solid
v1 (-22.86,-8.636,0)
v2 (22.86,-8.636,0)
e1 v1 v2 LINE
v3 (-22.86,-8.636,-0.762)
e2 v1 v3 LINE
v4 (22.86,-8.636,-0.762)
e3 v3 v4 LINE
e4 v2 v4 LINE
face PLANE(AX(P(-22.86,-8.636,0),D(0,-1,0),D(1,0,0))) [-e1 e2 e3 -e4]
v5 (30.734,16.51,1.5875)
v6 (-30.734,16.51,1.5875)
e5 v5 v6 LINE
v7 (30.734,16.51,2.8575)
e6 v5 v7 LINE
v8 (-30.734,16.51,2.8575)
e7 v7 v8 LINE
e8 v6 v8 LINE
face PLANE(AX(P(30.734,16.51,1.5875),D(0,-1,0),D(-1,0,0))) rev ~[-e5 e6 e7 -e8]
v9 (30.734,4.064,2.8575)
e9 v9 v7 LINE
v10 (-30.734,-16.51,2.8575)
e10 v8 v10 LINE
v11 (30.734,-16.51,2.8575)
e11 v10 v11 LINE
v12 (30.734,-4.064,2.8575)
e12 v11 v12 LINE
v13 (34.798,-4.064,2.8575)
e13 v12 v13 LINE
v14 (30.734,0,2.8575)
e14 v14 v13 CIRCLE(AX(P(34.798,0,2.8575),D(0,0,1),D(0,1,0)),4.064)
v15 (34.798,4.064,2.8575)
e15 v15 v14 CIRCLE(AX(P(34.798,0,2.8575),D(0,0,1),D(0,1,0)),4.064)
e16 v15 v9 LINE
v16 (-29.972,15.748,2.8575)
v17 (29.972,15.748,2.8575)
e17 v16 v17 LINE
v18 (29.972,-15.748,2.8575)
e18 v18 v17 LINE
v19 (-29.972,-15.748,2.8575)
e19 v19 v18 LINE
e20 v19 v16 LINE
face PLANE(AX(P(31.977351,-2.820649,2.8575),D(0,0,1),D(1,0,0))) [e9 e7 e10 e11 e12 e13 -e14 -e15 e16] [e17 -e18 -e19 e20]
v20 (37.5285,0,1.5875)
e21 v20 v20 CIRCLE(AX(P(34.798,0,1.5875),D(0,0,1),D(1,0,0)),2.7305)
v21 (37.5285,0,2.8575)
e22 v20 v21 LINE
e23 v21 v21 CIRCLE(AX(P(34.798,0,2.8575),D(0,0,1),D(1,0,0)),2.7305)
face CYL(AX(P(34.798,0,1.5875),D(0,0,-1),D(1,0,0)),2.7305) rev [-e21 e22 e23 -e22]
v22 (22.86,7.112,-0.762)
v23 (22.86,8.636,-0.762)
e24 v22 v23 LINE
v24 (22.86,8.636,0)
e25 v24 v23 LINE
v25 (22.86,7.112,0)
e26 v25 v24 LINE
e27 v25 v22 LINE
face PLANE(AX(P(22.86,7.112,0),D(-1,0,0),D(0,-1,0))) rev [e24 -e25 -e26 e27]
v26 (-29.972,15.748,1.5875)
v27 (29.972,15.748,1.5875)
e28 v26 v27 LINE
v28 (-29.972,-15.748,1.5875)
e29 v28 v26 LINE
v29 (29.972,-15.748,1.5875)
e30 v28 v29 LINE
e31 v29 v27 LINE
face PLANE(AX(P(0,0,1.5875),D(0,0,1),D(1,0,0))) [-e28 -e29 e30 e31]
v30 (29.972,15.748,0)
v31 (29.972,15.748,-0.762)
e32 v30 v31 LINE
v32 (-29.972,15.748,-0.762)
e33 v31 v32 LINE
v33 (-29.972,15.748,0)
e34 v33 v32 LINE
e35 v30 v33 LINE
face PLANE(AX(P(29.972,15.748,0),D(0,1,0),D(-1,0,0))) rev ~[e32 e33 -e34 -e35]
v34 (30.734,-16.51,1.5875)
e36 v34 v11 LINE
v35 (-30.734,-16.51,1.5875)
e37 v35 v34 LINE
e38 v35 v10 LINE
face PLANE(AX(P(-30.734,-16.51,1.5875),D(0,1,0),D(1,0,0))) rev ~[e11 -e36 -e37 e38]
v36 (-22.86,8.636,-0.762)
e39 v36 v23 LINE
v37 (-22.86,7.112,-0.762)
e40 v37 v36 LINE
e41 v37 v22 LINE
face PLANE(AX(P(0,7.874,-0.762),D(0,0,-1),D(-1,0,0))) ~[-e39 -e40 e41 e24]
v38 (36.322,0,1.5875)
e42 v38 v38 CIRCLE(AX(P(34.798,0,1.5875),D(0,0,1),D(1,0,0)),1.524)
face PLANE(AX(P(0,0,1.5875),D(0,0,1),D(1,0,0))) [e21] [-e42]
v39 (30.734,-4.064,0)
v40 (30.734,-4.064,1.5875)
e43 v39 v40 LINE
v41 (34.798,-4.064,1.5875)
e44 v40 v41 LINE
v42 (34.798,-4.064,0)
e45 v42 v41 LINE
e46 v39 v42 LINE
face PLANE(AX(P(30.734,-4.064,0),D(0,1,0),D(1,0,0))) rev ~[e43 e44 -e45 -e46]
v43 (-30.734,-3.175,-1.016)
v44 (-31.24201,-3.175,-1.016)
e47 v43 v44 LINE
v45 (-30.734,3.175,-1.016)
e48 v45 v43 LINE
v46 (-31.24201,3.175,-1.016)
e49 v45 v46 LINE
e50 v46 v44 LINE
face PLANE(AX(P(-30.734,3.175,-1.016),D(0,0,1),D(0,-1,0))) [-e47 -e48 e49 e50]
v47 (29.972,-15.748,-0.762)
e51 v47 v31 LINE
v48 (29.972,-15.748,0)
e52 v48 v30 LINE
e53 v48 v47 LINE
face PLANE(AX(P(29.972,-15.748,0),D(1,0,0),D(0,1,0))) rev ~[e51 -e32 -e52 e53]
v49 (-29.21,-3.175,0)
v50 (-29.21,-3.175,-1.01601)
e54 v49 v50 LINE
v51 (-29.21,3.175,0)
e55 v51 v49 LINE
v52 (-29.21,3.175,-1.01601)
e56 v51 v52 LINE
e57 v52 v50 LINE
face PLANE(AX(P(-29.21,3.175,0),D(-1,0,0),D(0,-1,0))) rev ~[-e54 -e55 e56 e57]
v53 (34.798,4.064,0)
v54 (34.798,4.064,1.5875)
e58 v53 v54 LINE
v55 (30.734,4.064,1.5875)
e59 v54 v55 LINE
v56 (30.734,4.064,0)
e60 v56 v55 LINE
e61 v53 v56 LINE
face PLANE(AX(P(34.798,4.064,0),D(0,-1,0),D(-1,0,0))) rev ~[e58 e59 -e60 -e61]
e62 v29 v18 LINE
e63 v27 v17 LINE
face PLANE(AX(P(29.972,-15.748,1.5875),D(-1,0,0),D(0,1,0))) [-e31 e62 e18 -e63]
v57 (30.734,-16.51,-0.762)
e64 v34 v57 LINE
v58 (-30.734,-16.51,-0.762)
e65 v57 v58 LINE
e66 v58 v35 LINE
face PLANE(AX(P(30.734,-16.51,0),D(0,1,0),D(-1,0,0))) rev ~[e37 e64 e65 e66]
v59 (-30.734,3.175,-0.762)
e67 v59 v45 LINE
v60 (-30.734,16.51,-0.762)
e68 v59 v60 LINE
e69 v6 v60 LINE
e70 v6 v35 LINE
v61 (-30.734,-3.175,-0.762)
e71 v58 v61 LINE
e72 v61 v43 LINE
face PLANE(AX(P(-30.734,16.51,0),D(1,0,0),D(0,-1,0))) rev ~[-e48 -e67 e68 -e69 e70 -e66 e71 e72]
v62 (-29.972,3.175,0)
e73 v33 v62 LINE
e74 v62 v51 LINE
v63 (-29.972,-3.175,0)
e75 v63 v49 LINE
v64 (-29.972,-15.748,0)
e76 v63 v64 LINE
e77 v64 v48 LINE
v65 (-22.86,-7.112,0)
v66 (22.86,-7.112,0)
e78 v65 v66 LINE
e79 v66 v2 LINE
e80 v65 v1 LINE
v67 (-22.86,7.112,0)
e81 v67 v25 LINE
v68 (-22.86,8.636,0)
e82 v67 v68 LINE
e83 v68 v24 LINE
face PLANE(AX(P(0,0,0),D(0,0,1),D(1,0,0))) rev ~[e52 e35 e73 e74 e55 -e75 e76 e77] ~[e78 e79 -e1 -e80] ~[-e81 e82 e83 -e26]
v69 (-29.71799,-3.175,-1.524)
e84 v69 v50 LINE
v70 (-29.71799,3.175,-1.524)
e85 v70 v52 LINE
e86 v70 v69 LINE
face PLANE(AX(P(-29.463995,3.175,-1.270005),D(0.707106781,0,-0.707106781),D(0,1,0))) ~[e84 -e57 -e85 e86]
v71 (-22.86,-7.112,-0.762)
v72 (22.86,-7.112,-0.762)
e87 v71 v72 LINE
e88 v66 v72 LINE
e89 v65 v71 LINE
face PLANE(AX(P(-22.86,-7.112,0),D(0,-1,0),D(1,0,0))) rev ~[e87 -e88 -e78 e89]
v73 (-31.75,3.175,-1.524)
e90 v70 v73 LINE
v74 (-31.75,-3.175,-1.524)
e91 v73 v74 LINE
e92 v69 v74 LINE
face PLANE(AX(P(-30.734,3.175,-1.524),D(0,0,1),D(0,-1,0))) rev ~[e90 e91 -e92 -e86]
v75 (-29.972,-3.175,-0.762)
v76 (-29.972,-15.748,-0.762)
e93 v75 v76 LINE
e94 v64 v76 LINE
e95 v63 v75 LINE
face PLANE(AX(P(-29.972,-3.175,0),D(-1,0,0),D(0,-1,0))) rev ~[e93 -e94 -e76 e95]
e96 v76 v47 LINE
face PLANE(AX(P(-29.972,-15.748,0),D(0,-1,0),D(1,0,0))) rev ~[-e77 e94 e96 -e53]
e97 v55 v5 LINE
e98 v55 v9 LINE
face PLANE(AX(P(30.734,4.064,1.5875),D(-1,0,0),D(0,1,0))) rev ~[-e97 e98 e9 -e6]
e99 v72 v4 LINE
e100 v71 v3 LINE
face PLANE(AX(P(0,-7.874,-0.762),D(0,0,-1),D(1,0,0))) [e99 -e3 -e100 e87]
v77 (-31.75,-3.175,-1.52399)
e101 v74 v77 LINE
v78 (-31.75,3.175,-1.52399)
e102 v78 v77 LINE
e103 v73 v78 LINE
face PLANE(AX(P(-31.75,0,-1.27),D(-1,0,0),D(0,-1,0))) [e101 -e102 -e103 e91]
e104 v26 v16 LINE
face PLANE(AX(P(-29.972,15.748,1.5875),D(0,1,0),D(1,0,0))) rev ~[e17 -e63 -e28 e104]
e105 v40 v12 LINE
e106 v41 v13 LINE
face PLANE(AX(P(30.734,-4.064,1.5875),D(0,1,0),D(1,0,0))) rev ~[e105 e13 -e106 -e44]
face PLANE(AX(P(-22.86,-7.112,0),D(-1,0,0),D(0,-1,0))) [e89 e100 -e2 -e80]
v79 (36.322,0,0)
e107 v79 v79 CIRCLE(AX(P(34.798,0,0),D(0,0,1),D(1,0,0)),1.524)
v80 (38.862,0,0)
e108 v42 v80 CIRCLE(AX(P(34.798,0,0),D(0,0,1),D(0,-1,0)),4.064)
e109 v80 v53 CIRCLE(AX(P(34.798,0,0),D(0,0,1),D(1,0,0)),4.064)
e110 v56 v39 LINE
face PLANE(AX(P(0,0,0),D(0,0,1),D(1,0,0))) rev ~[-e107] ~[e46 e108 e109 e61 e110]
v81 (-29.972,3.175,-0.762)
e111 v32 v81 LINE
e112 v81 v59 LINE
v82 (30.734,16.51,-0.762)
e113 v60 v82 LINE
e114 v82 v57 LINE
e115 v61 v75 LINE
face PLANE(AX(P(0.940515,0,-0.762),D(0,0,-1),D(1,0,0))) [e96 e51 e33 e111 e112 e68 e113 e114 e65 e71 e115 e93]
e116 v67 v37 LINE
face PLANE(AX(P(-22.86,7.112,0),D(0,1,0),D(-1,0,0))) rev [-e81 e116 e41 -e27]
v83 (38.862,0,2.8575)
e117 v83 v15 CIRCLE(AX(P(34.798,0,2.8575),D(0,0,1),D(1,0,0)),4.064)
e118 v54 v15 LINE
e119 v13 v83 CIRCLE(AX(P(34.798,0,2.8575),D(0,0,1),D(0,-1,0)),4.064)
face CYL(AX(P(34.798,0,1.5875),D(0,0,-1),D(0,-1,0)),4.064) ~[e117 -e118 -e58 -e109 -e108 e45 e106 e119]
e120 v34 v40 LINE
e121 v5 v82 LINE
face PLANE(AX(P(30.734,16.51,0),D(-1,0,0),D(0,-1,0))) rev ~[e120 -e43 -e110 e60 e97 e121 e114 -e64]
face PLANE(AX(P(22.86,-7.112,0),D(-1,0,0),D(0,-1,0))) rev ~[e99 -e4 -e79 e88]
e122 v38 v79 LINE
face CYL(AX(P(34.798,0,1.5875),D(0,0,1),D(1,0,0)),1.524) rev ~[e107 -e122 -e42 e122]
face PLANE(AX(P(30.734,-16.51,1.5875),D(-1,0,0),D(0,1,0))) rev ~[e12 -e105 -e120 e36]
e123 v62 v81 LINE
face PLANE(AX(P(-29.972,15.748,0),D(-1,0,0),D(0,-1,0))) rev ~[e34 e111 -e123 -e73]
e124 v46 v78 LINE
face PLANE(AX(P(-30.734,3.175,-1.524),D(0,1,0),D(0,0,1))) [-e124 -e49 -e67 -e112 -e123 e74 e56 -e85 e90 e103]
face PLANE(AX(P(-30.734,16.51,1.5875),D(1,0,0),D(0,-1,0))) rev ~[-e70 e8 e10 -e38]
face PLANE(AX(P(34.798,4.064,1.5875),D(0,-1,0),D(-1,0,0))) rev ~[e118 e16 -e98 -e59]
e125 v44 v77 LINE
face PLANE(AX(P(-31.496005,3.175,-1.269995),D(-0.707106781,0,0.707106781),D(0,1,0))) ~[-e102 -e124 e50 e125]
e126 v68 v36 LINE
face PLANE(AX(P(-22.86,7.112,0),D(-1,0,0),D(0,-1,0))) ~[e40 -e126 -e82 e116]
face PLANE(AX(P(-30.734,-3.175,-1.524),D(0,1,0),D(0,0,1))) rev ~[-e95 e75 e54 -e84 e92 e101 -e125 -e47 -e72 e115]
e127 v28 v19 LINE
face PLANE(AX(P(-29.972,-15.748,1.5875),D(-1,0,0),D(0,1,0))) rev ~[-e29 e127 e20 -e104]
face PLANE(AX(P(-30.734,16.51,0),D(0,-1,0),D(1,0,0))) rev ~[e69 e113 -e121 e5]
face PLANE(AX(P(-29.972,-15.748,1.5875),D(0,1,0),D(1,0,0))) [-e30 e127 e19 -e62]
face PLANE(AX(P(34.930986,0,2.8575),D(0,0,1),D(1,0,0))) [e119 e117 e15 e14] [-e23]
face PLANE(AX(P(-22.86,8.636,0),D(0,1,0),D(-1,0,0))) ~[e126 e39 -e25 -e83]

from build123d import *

# Parameters (mm, degrees)
F1_DEPTH  = 1.5875
F2_R      = 1.524
F3_DEPTH  = 1.5885
F4_R      = 2.7305
F5_DEPTH  = 1.27
F6_W      = 1.524
F6_H      = 6.35
F7_DEPTH  = 1.524
F8_W      = 6.35
F8_H      = 0.508
F9_DEPTH  = 1.016
F10_SIZE  = 0.50799
F12_DEPTH = 0.762
F13_W     = 59.944
F13_H     = 31.496
F14_DEPTH = 1.27
F15_W     = 45.72
F15_H     = 1.524
F16_DEPTH = 0.762


# Not quite as in the source:
# - a fillet or chamfer is up to 0.001 mm smaller than in the source, because OpenCascade refuses the exact size
# - a pattern or mirror of a feature is missing from the dataset's text; its kind, count and spacing are read off the source's solid


with BuildPart() as f1:
    # F0 (on Top) → F1 (new body)
    with BuildSketch(Plane.XY):
        Polygon((-30.734, -16.51), (30.734, -16.51), (30.734, -4.064), (30.734, 4.064), (30.734, 16.51), (-30.734, 16.51), align=None)
        with BuildLine():
            Line((30.734, 4.064), (30.734, -4.064))
            Line((30.734, -4.064), (34.798, -4.064))
            ThreePointArc((34.798, -4.064), (37.6716819587, -2.8736819587), (38.862, 0))
            ThreePointArc((38.862, 0), (37.6716819587, 2.8736819587), (34.798, 4.064))
            Line((34.798, 4.064), (30.734, 4.064))
        make_face()
    extrude(amount=F1_DEPTH)

    # F2 (on face) → F3 (cut, through all)
    with BuildSketch(Plane.XY.offset(1.5875)):
        with Locations((34.798, 0)):
            Circle(F2_R)
    extrude(amount=-F3_DEPTH, mode=Mode.SUBTRACT)

    # F4 (on face) → F5 (join)
    with BuildSketch(Plane.XY.offset(1.5875)):
        with BuildLine():
            ThreePointArc((34.798, -4.064), (37.6716819587, -2.8736819587), (38.862, 0))
            ThreePointArc((38.862, 0), (37.6716819587, 2.8736819587), (34.798, 4.064))
            ThreePointArc((34.798, 4.064), (30.734, 0), (34.798, -4.064))
        make_face()
        with Locations((34.798, 0)):
            Circle(F4_R, mode=Mode.SUBTRACT)
    extrude(amount=F5_DEPTH)

    # F6 (on face) → F7 (join)
    with BuildSketch(Plane(origin=(0, 0, 0), x_dir=(1, 0, 0), z_dir=(0, 0, -1))):
        with Locations((-29.972, 0)):
            Rectangle(F6_W, F6_H)
    extrude(amount=F7_DEPTH)

    # F8 (on face) → F9 (join)
    with BuildSketch(Plane(origin=(-30.734, 0, 0), x_dir=(0, -1, 0), z_dir=(-1, 0, 0))):
        with Locations((0, -1.27)):
            Rectangle(F8_W, F8_H)
    extrude(amount=F9_DEPTH)

    # F10 (size 0.508 in the source; OpenCascade refuses exactly that, so slightly less here)
    f10_edges = [f1.edges().sort_by_distance(p)[0] for p in [
        (-31.75, 0, -1.016),
        (-29.21, 0, -1.524),
    ]]
    chamfer(f10_edges, length=F10_SIZE)

    # F11 (on face) → F12 (join)
    with BuildSketch(Plane(origin=(0, 0, 0), x_dir=(1, 0, 0), z_dir=(0, 0, -1))):
        Polygon((-29.972, 3.175), (-29.972, 15.748), (29.972, 15.748), (29.972, -15.748), (-29.972, -15.748), (-29.972, -3.175), (-30.734, -3.175), (-30.734, -16.51), (30.734, -16.51), (30.734, -4.064), (30.734, 4.064), (30.734, 16.51), (-30.734, 16.51), (-30.734, 3.175), align=None)
    extrude(amount=F12_DEPTH)

    # F13 (on face) → F14 (join, through all)
    with BuildSketch(Plane.XY.offset(1.5875)):
        with BuildLine():
            ThreePointArc((34.798, -4.064), (31.9243180414, -2.8736819589), (30.734, -4e-10))
            Line((30.734, -4e-10), (30.734, -4.064))
            Line((30.734, -4.064), (34.798, -4.064))
        make_face()
        with BuildLine():
            Line((34.798, 4.064), (30.734, 4.064))
            Line((30.734, 4.064), (30.734, -4e-10))
            ThreePointArc((30.734, -4e-10), (31.9243180411, 2.8736819586), (34.798, 4.064))
        make_face()
        Polygon((30.734, 16.51), (-30.734, 16.51), (-30.734, -16.51), (30.734, -16.51), (30.734, -4.064), (30.734, -4e-10), (30.734, 4.064), align=None)
        Rectangle(F13_W, F13_H, mode=Mode.SUBTRACT)
    extrude(amount=F14_DEPTH)

    # F15 (on face) → F16 (join)
    with BuildSketch(Plane(origin=(0, 0, 0), x_dir=(1, 0, 0), z_dir=(0, 0, -1))):
        with Locations((0, 7.874)):
            Rectangle(F15_W, F15_H)
    f16 = extrude(amount=F16_DEPTH)

    # F16_copies: F16 across plane
    add(f16.mirror(Plane.ZX))


solid = f1.part
